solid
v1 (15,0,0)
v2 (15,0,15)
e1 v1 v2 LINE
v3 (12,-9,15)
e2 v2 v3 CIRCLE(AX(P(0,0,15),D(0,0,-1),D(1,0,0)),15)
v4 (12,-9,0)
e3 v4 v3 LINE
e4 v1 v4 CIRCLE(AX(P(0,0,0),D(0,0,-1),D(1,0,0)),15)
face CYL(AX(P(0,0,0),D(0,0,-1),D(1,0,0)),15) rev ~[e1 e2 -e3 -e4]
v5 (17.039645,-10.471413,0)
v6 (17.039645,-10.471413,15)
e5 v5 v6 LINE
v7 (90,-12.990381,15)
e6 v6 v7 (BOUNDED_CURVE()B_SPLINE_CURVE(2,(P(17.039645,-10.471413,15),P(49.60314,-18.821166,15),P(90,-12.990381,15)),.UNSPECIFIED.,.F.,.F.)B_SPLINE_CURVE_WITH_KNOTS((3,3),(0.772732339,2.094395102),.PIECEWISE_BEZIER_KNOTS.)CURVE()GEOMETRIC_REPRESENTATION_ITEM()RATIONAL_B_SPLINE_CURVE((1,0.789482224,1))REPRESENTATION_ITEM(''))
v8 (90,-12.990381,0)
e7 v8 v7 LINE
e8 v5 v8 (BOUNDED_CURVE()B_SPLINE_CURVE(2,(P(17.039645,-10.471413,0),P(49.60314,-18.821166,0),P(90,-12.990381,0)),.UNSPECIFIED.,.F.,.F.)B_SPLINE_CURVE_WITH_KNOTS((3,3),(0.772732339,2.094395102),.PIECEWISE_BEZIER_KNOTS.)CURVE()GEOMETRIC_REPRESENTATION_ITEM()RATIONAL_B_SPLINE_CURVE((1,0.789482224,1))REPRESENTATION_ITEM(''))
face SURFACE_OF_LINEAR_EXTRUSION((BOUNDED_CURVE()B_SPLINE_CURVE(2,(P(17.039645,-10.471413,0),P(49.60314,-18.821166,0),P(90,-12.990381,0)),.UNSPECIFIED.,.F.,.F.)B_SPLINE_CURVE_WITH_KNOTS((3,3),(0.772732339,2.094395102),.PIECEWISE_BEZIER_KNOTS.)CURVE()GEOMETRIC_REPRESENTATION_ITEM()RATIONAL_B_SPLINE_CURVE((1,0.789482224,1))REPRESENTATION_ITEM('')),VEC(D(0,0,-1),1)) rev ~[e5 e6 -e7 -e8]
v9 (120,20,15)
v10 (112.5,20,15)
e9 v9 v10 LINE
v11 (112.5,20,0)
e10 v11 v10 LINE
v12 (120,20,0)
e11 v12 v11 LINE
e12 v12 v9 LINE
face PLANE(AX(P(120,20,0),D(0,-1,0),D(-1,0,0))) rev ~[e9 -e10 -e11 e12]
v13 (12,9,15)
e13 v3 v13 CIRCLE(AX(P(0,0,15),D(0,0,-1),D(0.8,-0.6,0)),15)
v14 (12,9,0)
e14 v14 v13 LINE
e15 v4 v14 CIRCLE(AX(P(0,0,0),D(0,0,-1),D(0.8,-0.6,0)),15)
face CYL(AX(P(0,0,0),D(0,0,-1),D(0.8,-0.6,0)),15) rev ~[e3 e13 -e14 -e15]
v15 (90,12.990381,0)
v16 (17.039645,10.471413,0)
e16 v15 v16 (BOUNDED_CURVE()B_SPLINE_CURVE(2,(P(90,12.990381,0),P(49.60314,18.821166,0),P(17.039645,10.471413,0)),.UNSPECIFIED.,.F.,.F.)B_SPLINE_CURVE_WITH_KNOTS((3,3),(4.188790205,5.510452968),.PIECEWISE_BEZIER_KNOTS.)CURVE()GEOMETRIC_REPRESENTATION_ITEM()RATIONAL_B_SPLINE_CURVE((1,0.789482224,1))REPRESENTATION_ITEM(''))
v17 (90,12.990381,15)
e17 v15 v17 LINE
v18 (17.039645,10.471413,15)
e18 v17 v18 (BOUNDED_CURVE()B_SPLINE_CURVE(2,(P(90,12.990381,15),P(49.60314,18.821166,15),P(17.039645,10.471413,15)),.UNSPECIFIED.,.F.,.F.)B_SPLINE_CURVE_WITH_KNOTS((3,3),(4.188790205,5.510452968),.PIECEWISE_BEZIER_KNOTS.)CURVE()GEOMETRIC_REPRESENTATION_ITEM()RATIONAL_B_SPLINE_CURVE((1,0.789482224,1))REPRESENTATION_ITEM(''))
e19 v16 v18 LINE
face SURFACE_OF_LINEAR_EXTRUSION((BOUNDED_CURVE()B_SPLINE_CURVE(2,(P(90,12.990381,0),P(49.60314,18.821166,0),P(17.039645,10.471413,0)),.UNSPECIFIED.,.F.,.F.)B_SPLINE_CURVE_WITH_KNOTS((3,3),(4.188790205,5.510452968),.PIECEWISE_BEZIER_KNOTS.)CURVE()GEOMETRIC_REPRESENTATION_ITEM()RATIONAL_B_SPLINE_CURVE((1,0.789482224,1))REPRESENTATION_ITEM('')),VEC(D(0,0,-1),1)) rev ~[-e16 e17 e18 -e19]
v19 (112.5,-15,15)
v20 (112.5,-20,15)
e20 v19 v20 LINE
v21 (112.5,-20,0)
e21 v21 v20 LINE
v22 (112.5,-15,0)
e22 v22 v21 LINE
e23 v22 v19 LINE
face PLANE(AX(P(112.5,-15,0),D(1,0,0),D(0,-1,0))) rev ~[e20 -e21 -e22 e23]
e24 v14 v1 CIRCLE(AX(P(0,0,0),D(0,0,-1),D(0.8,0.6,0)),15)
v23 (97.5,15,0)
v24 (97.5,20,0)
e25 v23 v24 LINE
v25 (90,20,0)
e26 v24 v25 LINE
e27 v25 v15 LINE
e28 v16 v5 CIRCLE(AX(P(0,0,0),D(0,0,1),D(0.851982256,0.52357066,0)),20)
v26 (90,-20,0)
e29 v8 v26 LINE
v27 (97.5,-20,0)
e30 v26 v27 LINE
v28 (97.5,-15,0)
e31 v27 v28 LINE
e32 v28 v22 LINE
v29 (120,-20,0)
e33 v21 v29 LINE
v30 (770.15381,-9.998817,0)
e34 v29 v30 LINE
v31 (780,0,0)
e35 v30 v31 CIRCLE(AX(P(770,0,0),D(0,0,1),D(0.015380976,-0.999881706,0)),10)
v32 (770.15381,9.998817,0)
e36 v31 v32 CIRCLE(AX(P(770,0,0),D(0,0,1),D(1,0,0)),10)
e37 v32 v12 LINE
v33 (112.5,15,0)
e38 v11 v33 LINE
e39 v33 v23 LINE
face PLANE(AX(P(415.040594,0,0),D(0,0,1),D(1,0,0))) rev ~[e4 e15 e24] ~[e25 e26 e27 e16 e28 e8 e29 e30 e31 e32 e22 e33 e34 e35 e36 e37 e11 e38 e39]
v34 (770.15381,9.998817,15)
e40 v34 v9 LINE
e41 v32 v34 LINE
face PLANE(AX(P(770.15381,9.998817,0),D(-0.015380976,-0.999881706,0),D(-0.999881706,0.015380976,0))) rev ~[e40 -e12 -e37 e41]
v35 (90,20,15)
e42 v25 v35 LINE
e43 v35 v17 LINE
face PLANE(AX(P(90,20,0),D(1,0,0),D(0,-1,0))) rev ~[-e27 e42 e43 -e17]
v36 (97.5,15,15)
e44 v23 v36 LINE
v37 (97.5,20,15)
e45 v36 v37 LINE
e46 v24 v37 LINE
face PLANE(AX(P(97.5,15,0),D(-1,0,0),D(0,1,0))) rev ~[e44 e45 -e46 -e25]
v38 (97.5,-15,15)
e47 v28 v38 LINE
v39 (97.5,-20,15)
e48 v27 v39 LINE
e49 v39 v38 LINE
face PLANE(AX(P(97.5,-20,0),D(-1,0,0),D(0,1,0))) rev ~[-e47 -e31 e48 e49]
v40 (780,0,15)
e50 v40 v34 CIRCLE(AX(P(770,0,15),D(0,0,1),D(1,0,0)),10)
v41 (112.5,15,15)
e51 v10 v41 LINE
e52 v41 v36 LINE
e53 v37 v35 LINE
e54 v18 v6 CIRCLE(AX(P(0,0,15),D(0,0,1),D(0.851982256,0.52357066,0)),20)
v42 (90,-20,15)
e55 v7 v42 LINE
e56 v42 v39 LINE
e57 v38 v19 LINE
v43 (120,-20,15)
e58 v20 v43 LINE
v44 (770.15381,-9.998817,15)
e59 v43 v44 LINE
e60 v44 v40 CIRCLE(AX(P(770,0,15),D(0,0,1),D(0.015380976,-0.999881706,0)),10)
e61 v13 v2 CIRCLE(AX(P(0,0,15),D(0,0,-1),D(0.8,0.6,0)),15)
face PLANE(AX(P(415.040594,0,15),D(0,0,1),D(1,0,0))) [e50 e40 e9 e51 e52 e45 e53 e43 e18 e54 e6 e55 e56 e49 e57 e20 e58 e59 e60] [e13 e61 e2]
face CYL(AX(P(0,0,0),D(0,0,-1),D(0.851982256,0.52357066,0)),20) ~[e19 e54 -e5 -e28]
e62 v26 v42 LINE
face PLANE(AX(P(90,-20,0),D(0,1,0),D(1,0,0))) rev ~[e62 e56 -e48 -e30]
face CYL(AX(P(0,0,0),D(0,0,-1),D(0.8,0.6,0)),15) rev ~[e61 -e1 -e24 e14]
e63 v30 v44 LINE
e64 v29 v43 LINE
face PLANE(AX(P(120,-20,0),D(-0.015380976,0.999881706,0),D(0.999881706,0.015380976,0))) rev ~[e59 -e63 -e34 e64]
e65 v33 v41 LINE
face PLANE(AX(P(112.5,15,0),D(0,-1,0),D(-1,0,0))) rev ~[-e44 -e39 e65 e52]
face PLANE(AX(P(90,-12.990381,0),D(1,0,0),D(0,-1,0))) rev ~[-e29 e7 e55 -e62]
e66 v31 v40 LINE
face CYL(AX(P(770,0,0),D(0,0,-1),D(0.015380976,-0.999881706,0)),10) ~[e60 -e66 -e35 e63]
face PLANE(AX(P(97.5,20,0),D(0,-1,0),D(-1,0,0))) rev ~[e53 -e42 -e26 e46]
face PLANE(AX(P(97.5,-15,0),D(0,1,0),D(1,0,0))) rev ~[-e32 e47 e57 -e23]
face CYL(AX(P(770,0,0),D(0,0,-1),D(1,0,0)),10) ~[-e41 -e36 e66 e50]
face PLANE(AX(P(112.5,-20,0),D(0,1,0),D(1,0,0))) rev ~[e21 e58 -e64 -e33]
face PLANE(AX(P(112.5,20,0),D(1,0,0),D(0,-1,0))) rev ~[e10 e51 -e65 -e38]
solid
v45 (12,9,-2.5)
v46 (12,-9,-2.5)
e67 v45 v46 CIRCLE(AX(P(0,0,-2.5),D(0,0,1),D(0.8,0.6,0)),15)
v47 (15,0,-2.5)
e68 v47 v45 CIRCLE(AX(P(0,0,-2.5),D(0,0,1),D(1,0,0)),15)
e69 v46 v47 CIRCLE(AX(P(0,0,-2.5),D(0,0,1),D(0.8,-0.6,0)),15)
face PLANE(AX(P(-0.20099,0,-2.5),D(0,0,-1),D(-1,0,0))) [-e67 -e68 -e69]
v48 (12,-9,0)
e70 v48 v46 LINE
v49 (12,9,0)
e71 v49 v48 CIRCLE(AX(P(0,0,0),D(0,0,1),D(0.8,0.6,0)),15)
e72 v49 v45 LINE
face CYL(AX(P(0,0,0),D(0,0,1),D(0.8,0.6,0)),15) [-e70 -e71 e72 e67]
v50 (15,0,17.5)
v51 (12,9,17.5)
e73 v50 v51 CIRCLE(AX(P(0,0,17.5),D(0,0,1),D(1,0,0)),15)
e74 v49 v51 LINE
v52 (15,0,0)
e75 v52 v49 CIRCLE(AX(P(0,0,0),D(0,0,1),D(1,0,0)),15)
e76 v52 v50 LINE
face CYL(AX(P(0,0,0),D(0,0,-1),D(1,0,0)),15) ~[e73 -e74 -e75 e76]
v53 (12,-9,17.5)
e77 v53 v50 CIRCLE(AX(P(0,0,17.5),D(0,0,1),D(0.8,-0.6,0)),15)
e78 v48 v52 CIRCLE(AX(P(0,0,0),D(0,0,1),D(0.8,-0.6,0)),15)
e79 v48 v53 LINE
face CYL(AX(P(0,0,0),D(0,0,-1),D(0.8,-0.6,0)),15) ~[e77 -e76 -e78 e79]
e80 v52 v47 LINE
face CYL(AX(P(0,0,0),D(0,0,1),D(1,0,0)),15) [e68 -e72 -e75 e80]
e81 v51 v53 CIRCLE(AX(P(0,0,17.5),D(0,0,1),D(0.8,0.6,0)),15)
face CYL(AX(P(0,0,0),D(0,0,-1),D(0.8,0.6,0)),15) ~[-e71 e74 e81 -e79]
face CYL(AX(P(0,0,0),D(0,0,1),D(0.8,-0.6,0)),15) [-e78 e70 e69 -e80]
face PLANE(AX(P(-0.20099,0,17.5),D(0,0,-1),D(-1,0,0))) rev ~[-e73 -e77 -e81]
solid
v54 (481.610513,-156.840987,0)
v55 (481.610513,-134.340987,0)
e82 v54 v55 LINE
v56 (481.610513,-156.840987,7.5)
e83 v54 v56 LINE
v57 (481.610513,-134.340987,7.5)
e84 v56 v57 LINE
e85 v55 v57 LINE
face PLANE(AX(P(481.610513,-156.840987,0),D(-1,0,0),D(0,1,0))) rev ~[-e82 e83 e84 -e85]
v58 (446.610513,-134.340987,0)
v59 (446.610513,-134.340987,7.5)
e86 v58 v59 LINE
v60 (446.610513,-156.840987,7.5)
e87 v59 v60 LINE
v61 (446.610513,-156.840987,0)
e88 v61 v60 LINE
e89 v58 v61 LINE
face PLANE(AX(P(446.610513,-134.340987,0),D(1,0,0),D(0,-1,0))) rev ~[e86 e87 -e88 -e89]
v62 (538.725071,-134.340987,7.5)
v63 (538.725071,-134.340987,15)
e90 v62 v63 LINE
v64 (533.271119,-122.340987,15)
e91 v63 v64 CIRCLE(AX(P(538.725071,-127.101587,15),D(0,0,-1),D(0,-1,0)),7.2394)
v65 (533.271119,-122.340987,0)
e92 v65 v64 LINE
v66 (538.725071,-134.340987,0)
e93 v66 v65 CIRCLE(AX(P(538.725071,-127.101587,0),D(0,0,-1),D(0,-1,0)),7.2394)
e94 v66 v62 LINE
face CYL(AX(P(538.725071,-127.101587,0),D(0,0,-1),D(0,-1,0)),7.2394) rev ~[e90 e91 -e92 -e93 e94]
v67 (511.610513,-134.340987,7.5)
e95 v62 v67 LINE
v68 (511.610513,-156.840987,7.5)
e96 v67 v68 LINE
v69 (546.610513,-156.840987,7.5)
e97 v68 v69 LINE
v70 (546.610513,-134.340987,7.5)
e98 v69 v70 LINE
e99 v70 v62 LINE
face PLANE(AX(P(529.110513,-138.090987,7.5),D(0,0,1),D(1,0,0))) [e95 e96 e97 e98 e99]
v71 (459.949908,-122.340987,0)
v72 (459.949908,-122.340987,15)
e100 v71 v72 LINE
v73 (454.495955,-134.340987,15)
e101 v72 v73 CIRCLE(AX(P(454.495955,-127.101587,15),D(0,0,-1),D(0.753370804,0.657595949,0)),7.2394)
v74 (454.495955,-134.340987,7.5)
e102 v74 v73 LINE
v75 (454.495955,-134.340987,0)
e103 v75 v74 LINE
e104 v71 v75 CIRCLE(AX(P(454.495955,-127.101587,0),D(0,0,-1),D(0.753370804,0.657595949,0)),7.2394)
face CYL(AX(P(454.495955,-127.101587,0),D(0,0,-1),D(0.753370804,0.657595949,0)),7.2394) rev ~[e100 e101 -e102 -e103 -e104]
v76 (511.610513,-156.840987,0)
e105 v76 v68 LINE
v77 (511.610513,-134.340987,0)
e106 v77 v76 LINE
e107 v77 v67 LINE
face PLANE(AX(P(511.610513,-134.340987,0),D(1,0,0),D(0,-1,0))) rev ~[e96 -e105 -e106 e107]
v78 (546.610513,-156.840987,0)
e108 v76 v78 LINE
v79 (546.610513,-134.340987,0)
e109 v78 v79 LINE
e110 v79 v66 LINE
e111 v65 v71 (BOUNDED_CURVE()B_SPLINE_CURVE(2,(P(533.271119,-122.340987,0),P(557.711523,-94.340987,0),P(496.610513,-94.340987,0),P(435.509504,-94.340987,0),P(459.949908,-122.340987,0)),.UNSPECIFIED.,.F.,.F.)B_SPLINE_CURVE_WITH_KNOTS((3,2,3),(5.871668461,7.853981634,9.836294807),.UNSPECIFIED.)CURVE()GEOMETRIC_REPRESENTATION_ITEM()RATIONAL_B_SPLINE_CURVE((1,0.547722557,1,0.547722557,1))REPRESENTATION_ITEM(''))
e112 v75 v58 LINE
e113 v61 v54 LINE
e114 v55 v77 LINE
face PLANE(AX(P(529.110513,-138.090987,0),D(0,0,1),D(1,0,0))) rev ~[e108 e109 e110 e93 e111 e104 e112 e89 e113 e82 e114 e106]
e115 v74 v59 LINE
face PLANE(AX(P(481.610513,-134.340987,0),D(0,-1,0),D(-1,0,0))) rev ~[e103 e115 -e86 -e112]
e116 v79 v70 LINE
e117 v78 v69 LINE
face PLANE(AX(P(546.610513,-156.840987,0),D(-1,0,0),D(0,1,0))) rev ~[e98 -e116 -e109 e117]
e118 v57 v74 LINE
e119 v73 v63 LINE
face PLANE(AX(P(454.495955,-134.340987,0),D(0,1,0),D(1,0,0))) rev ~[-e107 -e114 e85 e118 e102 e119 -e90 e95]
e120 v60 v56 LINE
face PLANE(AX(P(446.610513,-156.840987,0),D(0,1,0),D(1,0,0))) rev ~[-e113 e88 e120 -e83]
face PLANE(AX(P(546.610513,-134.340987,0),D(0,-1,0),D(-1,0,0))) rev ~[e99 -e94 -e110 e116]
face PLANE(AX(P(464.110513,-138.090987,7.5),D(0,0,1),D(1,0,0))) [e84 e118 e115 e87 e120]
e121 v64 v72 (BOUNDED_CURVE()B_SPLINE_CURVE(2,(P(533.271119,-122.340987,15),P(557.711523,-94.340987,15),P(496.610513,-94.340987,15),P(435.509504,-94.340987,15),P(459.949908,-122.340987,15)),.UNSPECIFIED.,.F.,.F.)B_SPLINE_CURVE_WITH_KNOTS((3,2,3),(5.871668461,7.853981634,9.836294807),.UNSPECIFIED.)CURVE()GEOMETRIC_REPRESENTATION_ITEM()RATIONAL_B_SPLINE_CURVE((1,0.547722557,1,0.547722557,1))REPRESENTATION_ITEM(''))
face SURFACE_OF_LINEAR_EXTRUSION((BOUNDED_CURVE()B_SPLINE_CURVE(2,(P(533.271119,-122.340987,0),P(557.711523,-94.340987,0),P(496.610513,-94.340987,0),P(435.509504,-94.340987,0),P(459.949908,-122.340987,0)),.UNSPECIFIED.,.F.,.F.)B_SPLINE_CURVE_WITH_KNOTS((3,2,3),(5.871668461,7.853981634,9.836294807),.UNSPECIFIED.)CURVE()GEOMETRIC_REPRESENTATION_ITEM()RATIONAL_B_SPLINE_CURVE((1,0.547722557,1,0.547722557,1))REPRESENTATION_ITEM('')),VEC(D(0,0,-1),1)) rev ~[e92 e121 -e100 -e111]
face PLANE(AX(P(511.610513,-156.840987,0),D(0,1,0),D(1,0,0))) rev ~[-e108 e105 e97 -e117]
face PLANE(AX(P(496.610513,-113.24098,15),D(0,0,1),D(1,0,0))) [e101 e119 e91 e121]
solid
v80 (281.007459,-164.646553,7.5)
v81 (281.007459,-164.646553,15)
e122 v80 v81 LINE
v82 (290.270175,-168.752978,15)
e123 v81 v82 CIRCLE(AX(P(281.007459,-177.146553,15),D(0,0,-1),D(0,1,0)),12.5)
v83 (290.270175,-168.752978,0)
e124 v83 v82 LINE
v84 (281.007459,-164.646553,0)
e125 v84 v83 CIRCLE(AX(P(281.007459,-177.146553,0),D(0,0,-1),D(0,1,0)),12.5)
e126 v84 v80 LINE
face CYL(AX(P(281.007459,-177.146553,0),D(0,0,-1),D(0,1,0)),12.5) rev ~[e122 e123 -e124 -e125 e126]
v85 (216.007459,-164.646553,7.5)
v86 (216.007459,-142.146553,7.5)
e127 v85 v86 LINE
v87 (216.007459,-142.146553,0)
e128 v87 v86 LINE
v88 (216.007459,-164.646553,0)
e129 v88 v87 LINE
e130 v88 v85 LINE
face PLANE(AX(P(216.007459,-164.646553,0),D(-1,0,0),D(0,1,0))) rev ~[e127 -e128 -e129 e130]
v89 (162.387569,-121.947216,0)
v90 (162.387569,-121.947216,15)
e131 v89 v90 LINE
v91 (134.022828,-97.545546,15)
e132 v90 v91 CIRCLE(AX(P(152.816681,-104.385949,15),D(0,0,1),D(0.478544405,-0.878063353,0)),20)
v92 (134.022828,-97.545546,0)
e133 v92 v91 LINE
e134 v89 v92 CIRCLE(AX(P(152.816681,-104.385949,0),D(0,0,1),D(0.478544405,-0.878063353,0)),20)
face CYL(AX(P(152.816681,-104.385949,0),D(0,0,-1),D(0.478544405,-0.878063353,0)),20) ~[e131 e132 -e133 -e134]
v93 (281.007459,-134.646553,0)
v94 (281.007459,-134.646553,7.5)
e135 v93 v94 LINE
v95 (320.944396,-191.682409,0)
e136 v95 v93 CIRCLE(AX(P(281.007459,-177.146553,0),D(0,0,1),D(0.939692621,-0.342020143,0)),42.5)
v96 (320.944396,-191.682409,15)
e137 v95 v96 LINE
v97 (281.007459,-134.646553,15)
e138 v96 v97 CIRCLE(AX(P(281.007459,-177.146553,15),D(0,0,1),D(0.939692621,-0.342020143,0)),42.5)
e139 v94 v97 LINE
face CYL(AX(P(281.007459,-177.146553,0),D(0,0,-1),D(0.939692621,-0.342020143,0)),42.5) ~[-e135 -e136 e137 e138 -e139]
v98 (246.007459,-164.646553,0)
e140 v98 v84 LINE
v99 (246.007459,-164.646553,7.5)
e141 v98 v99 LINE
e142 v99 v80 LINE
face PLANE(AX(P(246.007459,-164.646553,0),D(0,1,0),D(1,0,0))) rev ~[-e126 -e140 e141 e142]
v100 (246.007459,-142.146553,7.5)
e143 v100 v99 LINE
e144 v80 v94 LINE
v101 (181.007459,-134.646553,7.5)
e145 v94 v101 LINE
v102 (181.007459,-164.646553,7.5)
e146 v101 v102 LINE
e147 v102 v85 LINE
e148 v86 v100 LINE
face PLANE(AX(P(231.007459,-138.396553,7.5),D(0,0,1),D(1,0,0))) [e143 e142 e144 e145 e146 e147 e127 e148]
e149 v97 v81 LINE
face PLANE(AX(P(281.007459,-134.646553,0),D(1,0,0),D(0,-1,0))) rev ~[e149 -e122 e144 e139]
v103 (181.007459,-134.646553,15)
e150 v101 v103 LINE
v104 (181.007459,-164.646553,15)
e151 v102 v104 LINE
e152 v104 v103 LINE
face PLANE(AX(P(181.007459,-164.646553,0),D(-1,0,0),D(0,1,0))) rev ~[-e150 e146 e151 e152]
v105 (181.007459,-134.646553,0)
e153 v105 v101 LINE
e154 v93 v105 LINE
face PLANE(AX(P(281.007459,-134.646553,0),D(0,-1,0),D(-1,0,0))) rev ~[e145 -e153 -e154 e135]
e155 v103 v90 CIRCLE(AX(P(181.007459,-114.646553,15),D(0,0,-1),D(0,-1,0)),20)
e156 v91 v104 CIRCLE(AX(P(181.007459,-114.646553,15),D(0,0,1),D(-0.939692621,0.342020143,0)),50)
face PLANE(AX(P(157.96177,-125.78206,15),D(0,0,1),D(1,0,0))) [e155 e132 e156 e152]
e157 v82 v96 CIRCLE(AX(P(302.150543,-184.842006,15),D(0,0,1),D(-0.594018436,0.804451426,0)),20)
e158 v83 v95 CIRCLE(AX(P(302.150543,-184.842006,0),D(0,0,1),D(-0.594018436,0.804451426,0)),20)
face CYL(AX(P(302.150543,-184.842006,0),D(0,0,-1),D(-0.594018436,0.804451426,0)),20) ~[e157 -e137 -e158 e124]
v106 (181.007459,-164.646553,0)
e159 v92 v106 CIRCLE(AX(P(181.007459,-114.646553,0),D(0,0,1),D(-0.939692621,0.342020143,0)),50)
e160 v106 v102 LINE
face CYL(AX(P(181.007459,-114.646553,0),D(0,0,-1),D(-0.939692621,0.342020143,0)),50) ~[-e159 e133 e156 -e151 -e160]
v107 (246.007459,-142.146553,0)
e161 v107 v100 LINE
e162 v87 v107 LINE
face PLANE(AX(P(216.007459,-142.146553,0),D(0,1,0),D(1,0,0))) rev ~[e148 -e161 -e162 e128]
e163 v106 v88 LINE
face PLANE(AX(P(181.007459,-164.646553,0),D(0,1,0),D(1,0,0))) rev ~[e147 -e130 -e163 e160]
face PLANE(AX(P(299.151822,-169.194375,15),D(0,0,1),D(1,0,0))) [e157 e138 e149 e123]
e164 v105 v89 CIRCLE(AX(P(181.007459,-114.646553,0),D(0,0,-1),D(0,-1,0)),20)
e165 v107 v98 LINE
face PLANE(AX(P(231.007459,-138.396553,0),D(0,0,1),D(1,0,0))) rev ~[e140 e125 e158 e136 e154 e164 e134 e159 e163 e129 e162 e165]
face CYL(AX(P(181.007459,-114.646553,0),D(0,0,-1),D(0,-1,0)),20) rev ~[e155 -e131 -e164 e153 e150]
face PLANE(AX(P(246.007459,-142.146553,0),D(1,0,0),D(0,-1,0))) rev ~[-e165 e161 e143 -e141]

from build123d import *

# Parameters (mm, degrees)
F1_DEPTH      = 15
F0_W          = 35
F0_H          = 7.5
F2_DEPTH      = 7.5
F3_DEPTH      = 7.5
F4_DEPTH      = 17.5
F4_DEPTH_BACK = 2.5


# Not quite as in the source:
# - a feature names something its author has since deleted; it is built from what else it names


with BuildPart() as f1:
    # F0 (on Top) → F1 (new body)
    with BuildSketch(Plane.XY):
        with BuildLine():
            Line((90, 20), (90, 12.9903810568))
            add(Edge.make_bspline(
                [(90, -12.9903810568), (180, 0), (90, 12.9903810568)],
                knots=[2.0943951024, 2.0943951024, 2.0943951024, 4.1887902048, 4.1887902048, 4.1887902048], degree=2, weights=[1, 0.5, 1]))
            Line((90, -12.9903810568), (90, -20))
            Line((90, -20), (97.5, -20))
            Line((97.5, -20), (97.5, -15))
            Line((97.5, -15), (112.5, -15))
            Line((112.5, -15), (112.5, -20))
            Line((112.5, -20), (120, -20))
            Line((120, -20), (770.1538097556, -9.998817058))
            ThreePointArc((770.1538097556, -9.998817058), (760, 0), (770.1538097556, 9.998817058))
            Line((770.1538097556, 9.998817058), (120, 20))
            Line((120, 20), (112.5, 20))
            Line((112.5, 20), (112.5, 15))
            Line((112.5, 15), (97.5, 15))
            Line((97.5, 15), (97.5, 20))
            Line((97.5, 20), (90, 20))
        make_face()
        with BuildLine():
            add(Edge.make_bspline(
                [(90, -12.9903810568), (180, 0), (90, 12.9903810568)],
                knots=[2.0943951024, 2.0943951024, 2.0943951024, 4.1887902048, 4.1887902048, 4.1887902048], degree=2, weights=[1, 0.5, 1]))
            Line((90, 12.9903810568), (90, -12.9903810568))
        make_face()
        with BuildLine():
            ThreePointArc((17.0396451174, -10.4714131937), (19.2456865602, -5.4409143373), (20, 0))
            ThreePointArc((20, 0), (19.2456865602, 5.4409143373), (17.0396451174, 10.4714131937))
            add(Edge.make_bspline(
                [(17.0396451174, 10.4714131937), (14.3294049387, 9.7764683129), (12, 9)],
                knots=[5.5104529682, 5.5104529682, 5.5104529682, 5.6396841984, 5.6396841984, 5.6396841984], degree=2, weights=[1, 0.9979131374, 1]))
            ThreePointArc((12, 9), (14.2302494708, 4.7434164903), (15, 0))
            ThreePointArc((15, 0), (14.2302494708, -4.7434164903), (12, -9))
            add(Edge.make_bspline(
                [(12, -9), (14.3294049387, -9.7764683129), (17.0396451174, -10.4714131937)],
                knots=[0.6435011088, 0.6435011088, 0.6435011088, 0.7727323389, 0.7727323389, 0.7727323389], degree=2, weights=[1, 0.9979131374, 1]))
        make_face()
        with BuildLine():
            add(Edge.make_bspline(
                [(17.0396451174, 10.4714131937), (14.3294049387, 9.7764683129), (12, 9)],
                knots=[5.5104529682, 5.5104529682, 5.5104529682, 5.6396841984, 5.6396841984, 5.6396841984], degree=2, weights=[1, 0.9979131374, 1]))
            ThreePointArc((17.0396451174, 10.4714131937), (-20, 0), (17.0396451174, -10.4714131937))
            add(Edge.make_bspline(
                [(12, -9), (14.3294049387, -9.7764683129), (17.0396451174, -10.4714131937)],
                knots=[0.6435011088, 0.6435011088, 0.6435011088, 0.7727323389, 0.7727323389, 0.7727323389], degree=2, weights=[1, 0.9979131374, 1]))
            ThreePointArc((12, -9), (-15, 0), (12, 9))
        make_face()
        with BuildLine():
            ThreePointArc((17.0396451174, 10.4714131937), (19.2456865602, 5.4409143373), (20, 0))
            ThreePointArc((20, 0), (19.2456865602, -5.4409143373), (17.0396451174, -10.4714131937))
            add(Edge.make_bspline(
                [(17.0396451174, -10.4714131937), (49.6031402439, -18.8211655204), (90, -12.9903810568)],
                knots=[0.7727323389, 0.7727323389, 0.7727323389, 2.0943951024, 2.0943951024, 2.0943951024], degree=2, weights=[1, 0.7894822244, 1]))
            Line((90, -12.9903810568), (90, 12.9903810568))
            add(Edge.make_bspline(
                [(90, 12.9903810568), (49.6031402439, 18.8211655204), (17.0396451174, 10.4714131937)],
                knots=[4.1887902048, 4.1887902048, 4.1887902048, 5.5104529682, 5.5104529682, 5.5104529682], degree=2, weights=[1, 0.7894822244, 1]))
        make_face()
        with BuildLine():
            ThreePointArc((780, 0), (777.1252402611, 7.0164771233), (770.1538097556, 9.998817058))
            ThreePointArc((770.1538097556, 9.998817058), (760, 0), (770.1538097556, -9.998817058))
            ThreePointArc((770.1538097556, -9.998817058), (777.1252402611, -7.0164771233), (780, 0))
        make_face()
    extrude(amount=F1_DEPTH)


with BuildPart() as f1b:
    # F0 (on Top) → F1, piece 2 (new body)
    with BuildSketch(Plane.XY):
        with BuildLine():
            Line((181.0074592861, -142.1465528079), (181.0074592861, -134.6465528079))
            ThreePointArc((181.0074592861, -134.6465528079), (169.7383256758, -131.1694650111), (162.3875687612, -121.9472155752))
            ThreePointArc((162.3875687612, -121.9472155752), (165.8599218849, -89.2243569553), (134.0228282468, -97.5455456416))
            ThreePointArc((134.0228282468, -97.5455456416), (140.0498570717, -143.3253746254), (181.0074592861, -164.6465528079))
            Line((181.0074592861, -164.6465528079), (181.0074592861, -149.6465528079))
            Line((181.0074592861, -149.6465528079), (181.0074592861, -142.1465528079))
        make_face()
    extrude(amount=F1_DEPTH)



with BuildPart() as f1c:
    # F0 (on Top) → F1, piece 3 (new body)
    with BuildSketch(Plane.XY):
        with BuildLine():
            ThreePointArc((320.9443956695, -191.6824088992), (315.8214211684, -152.769554263), (281.0074592861, -134.6465528079))
            Line((281.0074592861, -134.6465528079), (281.0074592861, -142.1465528079))
            Line((281.0074592861, -142.1465528079), (281.0074592861, -149.6465528079))
            Line((281.0074592861, -149.6465528079), (281.0074592861, -164.6465528079))
            ThreePointArc((281.0074592861, -164.6465528079), (286.0735380817, -165.7191801598), (290.2701745279, -168.7529775059))
            ThreePointArc((290.2701745279, -168.7529775059), (290.1760382458, -200.8610955765), (320.9443956695, -191.6824088992))
        make_face()
    extrude(amount=F1_DEPTH)


with BuildPart() as f1d:
    # F0 (on Top) → F1, piece 4 (new body)
    with BuildSketch(Plane.XY):
        with BuildLine():
            add(Edge.make_bspline(
                [(527.8355032662, -126.8409866095), (531.1499030026, -124.7711446375), (533.2711188339, -122.3409866095)],
                knots=[5.6080537742, 5.6080537742, 5.6080537742, 5.8716684611, 5.8716684611, 5.8716684611], degree=2, weights=[1, 0.991325981, 1]))
            add(Edge.make_bspline(
                [(533.2711188339, -122.3409866095), (557.7115225403, -94.3409866095), (496.6105132742, -94.3409866095), (435.5095040081, -94.3409866095), (459.9499077146, -122.3409866095)],
                knots=[5.8716684611, 5.8716684611, 5.8716684611, 7.853981634, 7.853981634, 9.8362948068, 9.8362948068, 9.8362948068], degree=2, weights=[1, 0.5477225575, 1, 0.5477225575, 1]))
            add(Edge.make_bspline(
                [(459.9499077146, -122.3409866095), (462.0711235458, -124.7711446375), (465.3855232822, -126.8409866095)],
                knots=[3.5531094997, 3.5531094997, 3.5531094997, 3.8167241865, 3.8167241865, 3.8167241865], degree=2, weights=[1, 0.991325981, 1]))
            Line((465.3855232822, -126.8409866095), (527.8355032662, -126.8409866095))
        make_face()
        with BuildLine():
            add(Edge.make_bspline(
                [(465.3855232822, -126.8409866095), (477.3951348176, -134.3409866095), (496.6105132742, -134.3409866095)],
                knots=[3.8167241865, 3.8167241865, 3.8167241865, 4.7123889804, 4.7123889804, 4.7123889804], degree=2, weights=[1, 0.9013878189, 1]))
            add(Edge.make_bspline(
                [(496.6105132742, -134.3409866095), (515.8258917308, -134.3409866095), (527.8355032662, -126.8409866095)],
                knots=[4.7123889804, 4.7123889804, 4.7123889804, 5.6080537742, 5.6080537742, 5.6080537742], degree=2, weights=[1, 0.9013878189, 1]))
            Line((527.8355032662, -126.8409866095), (465.3855232822, -126.8409866095))
        make_face()
        with BuildLine():
            Line((454.4959551719, -134.3409866095), (481.6105132742, -134.3409866095))
            Line((481.6105132742, -134.3409866095), (496.6105132742, -134.3409866095))
            add(Edge.make_bspline(
                [(465.3855232822, -126.8409866095), (477.3951348176, -134.3409866095), (496.6105132742, -134.3409866095)],
                knots=[3.8167241865, 3.8167241865, 3.8167241865, 4.7123889804, 4.7123889804, 4.7123889804], degree=2, weights=[1, 0.9013878189, 1]))
            add(Edge.make_bspline(
                [(459.9499077146, -122.3409866095), (462.0711235458, -124.7711446375), (465.3855232822, -126.8409866095)],
                knots=[3.5531094997, 3.5531094997, 3.5531094997, 3.8167241865, 3.8167241865, 3.8167241865], degree=2, weights=[1, 0.991325981, 1]))
            ThreePointArc((459.9499077146, -122.3409866095), (461.0865848523, -130.097001804), (454.4959551719, -134.3409866095))
        make_face()
        with BuildLine():
            Line((496.6105132742, -134.3409866095), (511.6105132742, -134.3409866095))
            Line((511.6105132742, -134.3409866095), (538.7250713765, -134.3409866095))
            ThreePointArc((538.7250713765, -134.3409866095), (532.1344416961, -130.097001804), (533.2711188339, -122.3409866095))
            add(Edge.make_bspline(
                [(527.8355032662, -126.8409866095), (531.1499030026, -124.7711446375), (533.2711188339, -122.3409866095)],
                knots=[5.6080537742, 5.6080537742, 5.6080537742, 5.8716684611, 5.8716684611, 5.8716684611], degree=2, weights=[1, 0.991325981, 1]))
            add(Edge.make_bspline(
                [(496.6105132742, -134.3409866095), (515.8258917308, -134.3409866095), (527.8355032662, -126.8409866095)],
                knots=[4.7123889804, 4.7123889804, 4.7123889804, 5.6080537742, 5.6080537742, 5.6080537742], degree=2, weights=[1, 0.9013878189, 1]))
        make_face()
    extrude(amount=F1_DEPTH)

    # F0 (on Top) → F2 (join)
    with BuildSketch(Plane.XY):
        Polygon((511.6105132742, -141.8409866095), (546.6105132742, -141.8409866095), (546.6105132742, -134.3409866095), (538.7250713765, -134.3409866095), (511.6105132742, -134.3409866095), align=None)
        Polygon((446.6105132742, -141.8409866095), (481.6105132742, -141.8409866095), (481.6105132742, -134.3409866095), (454.4959551719, -134.3409866095), (446.6105132742, -134.3409866095), align=None)
        with Locations((529.1105132742, -153.0909866095)):
            Rectangle(F0_W, F0_H)
        with Locations((529.1105132742, -145.5909866095)):
            Rectangle(F0_W, F0_H)
        with Locations((464.1105132742, -153.0909866095)):
            Rectangle(F0_W, F0_H)
        with Locations((464.1105132742, -145.5909866095)):
            Rectangle(F0_W, F0_H)
    extrude(amount=F2_DEPTH)


with BuildPart() as f1b_1:
    add(f1b.part)

    add(f1c.part)  # F3 merges F1c
    # F0 (on Top) → F3 (join)
    with BuildSketch(Plane.XY):
        Polygon((281.0074592861, -134.6465528079), (181.0074592861, -134.6465528079), (181.0074592861, -142.1465528079), (216.0074592861, -142.1465528079), (246.0074592861, -142.1465528079), (281.0074592861, -142.1465528079), align=None)
        Polygon((216.0074592861, -142.1465528079), (181.0074592861, -142.1465528079), (181.0074592861, -149.6465528079), (181.0074592861, -164.6465528079), (216.0074592861, -164.6465528079), (216.0074592861, -157.1465528079), align=None)
        Polygon((281.0074592861, -149.6465528079), (281.0074592861, -142.1465528079), (246.0074592861, -142.1465528079), (246.0074592861, -157.1465528079), (246.0074592861, -164.6465528079), (281.0074592861, -164.6465528079), align=None)
    extrude(amount=F3_DEPTH)


with BuildPart() as f4:
    # F0 (on Top) → F4 (new body, two sides)
    with BuildSketch(Plane.XY) as f4_sk:
        with BuildLine():
            add(Edge.make_bspline(
                [(12, 9), (0, 5), (0, 0)],
                knots=[5.6396841984, 5.6396841984, 5.6396841984, 6.2831853072, 6.2831853072, 6.2831853072], degree=2, weights=[1, 0.9486832981, 1]))
            ThreePointArc((12, 9), (-15, 0), (12, -9))
            add(Edge.make_bspline(
                [(0, 0), (0, -5), (12, -9)],
                knots=[0, 0, 0, 0.6435011088, 0.6435011088, 0.6435011088], degree=2, weights=[1, 0.9486832981, 1]))
        make_face()
        with BuildLine():
            ThreePointArc((15, 0), (14.2302494708, 4.7434164903), (12, 9))
            add(Edge.make_bspline(
                [(12, 9), (0, 5), (0, 0)],
                knots=[5.6396841984, 5.6396841984, 5.6396841984, 6.2831853072, 6.2831853072, 6.2831853072], degree=2, weights=[1, 0.9486832981, 1]))
            add(Edge.make_bspline(
                [(0, 0), (0, -5), (12, -9)],
                knots=[0, 0, 0, 0.6435011088, 0.6435011088, 0.6435011088], degree=2, weights=[1, 0.9486832981, 1]))
            ThreePointArc((12, -9), (14.2302494708, -4.7434164903), (15, 0))
        make_face()
    extrude(amount=F4_DEPTH)
    extrude(f4_sk.sketch, amount=-F4_DEPTH_BACK)


solid = Compound([f1.part, f1d.part, f1b_1.part, f4.part])
